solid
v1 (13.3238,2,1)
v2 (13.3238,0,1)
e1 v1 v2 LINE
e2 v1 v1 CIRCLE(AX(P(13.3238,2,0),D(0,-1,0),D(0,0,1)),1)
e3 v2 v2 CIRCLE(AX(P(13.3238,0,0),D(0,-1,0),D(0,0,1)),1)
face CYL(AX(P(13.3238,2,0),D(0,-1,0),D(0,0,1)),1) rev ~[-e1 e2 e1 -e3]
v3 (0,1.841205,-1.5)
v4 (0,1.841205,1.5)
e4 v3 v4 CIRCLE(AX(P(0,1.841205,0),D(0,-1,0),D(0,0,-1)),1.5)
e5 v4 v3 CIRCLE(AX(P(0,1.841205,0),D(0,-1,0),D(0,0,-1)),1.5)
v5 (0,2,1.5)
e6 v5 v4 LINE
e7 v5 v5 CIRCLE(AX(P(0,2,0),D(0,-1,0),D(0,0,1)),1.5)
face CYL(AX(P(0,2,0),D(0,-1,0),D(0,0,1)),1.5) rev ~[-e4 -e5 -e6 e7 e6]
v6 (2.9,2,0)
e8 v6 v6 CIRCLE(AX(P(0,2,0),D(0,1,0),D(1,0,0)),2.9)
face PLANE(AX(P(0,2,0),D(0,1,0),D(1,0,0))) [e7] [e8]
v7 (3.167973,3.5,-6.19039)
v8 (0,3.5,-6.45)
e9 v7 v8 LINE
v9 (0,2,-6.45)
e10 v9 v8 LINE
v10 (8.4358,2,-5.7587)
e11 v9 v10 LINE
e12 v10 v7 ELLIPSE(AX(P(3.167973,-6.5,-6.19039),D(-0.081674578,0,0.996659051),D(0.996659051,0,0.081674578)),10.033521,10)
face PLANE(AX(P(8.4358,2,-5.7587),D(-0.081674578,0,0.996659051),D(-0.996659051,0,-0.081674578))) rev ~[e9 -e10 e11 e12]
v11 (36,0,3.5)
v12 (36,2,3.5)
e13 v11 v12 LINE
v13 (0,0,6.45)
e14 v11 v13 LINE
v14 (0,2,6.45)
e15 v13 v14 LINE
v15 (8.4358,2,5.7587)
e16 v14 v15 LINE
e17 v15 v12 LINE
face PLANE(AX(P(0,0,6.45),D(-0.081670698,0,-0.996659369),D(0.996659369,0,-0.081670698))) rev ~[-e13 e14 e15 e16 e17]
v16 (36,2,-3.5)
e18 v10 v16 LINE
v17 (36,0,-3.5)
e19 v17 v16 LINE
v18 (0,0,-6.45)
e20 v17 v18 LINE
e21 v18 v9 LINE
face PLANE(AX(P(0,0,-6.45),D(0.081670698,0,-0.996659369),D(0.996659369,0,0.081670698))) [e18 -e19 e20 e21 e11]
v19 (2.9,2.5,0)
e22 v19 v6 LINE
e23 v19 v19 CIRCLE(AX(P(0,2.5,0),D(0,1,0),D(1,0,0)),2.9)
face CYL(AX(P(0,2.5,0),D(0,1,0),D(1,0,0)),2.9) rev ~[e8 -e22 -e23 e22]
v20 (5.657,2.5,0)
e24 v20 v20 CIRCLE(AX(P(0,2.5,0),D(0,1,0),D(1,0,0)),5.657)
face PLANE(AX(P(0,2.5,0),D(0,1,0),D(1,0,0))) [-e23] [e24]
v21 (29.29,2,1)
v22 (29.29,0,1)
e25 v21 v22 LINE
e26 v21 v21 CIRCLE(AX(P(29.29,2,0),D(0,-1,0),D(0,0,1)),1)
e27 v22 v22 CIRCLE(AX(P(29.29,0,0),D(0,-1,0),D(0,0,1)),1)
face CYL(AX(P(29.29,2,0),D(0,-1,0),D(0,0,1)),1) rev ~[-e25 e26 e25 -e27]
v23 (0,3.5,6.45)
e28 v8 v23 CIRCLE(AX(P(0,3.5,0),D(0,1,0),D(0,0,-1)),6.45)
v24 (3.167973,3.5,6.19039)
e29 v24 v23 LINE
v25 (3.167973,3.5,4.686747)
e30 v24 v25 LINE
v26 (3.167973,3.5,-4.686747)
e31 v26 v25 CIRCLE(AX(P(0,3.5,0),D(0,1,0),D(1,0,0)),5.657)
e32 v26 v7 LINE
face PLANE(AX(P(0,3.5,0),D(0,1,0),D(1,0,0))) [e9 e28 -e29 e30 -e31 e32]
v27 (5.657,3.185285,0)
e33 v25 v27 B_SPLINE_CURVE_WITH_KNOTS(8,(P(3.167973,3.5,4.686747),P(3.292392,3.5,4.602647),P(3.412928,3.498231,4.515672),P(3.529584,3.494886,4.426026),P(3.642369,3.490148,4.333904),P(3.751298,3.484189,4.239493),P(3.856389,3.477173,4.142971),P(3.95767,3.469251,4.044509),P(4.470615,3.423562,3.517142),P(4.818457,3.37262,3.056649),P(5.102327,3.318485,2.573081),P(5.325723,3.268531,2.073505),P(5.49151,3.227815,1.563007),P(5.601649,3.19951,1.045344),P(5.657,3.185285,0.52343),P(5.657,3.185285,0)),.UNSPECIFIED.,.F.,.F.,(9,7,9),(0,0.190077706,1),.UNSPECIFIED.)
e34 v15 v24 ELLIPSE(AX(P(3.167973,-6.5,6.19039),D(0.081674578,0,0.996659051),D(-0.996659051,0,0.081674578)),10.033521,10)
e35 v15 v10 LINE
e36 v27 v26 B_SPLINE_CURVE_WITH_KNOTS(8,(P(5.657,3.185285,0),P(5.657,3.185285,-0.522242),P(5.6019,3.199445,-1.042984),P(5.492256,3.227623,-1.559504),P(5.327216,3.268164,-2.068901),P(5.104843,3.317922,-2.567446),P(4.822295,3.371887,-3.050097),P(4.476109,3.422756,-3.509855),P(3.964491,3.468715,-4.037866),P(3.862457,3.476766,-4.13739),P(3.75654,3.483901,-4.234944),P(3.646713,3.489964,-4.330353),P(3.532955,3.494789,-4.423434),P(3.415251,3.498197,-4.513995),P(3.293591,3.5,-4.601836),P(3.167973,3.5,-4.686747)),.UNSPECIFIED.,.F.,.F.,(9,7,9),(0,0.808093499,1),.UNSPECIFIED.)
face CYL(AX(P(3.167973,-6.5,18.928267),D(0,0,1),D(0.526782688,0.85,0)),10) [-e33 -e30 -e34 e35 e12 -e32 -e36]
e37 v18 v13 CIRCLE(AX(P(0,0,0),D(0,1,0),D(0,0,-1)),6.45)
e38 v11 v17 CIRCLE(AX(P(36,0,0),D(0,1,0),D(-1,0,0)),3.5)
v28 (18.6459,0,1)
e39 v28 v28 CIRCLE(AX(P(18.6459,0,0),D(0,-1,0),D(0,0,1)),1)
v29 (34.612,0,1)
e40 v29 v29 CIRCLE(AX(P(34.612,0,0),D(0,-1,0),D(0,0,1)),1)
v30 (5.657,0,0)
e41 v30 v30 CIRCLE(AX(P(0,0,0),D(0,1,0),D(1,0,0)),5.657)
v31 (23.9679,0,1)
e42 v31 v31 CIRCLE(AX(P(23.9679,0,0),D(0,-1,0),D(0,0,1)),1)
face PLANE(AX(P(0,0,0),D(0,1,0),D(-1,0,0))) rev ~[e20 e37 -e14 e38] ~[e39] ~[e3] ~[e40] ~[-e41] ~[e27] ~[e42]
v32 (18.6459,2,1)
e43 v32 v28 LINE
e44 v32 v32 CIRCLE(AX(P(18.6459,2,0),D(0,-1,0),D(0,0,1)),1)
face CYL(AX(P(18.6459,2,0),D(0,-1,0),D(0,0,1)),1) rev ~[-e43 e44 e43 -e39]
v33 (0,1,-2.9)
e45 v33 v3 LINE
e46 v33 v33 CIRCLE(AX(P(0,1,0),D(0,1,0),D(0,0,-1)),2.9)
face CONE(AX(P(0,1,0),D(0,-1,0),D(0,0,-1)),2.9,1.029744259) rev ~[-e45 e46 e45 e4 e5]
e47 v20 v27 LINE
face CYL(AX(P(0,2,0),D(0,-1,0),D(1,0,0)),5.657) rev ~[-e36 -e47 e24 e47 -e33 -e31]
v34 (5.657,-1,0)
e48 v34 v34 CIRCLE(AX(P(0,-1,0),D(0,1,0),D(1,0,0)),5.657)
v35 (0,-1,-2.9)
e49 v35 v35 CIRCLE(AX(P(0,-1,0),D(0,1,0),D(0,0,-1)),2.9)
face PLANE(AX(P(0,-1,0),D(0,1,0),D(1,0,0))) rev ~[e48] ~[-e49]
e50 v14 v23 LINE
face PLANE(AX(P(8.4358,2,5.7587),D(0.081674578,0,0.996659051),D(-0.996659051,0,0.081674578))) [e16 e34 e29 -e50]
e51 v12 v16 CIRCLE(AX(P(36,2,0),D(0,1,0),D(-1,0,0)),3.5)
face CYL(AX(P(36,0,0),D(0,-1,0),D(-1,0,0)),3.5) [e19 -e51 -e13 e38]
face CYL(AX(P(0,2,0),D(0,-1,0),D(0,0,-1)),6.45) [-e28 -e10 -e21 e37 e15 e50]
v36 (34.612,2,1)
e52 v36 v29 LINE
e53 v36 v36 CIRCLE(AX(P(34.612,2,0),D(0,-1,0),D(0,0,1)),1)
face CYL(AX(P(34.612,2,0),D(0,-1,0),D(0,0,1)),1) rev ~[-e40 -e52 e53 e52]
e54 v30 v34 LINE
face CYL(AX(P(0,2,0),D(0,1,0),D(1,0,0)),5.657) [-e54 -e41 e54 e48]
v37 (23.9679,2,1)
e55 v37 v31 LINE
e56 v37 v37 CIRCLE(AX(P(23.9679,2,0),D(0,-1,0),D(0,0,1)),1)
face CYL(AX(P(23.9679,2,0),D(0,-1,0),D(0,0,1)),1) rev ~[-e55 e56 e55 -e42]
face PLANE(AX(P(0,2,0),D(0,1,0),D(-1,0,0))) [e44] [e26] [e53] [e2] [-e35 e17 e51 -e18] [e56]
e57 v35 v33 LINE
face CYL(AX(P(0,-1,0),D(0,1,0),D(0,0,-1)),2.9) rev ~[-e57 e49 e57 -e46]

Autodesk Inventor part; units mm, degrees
ref_plane "YZ Plane" through (0, 0, 0) normal (1, 0, 0) x (0, 1, 0)
ref_plane "XZ Plane" through (0, 0, 0) normal (0, 1, 0) x (-1, 0, 0)
ref_plane "XY Plane" through (0, 0, 0) normal (0, 0, 1) x (1, 0, 0)
sketch "Sketch1" plane through (0, 0, 0) normal (0, 1, 0) x (-1, 0, 0)
  circle A0 centre (0, 0) radius 6.45
  circle A1 centre (0, 0) radius 5.657
  circle A2 centre (0, 0) radius 2.85
  circle A3 centre (0, 0) radius 1.5
  line L0 (0, 0) -> (-36, 0)
  circle A4 centre (-36, 0) radius 3.5
  line L1 (0, 6.45) -> (-36, 3.5)
  line L2 (0, -6.45) -> (-36, -3.5)
  dimension "d0" = 12.9
  dimension "d1" = 11.314
  dimension "d2" = 5.7
  dimension "d3" = 3
  dimension "d4" = 36
  dimension "d5" = 7
extrude "Extrusion1" add sketch "Sketch1" along normal blind 2 contours A0 L2 L1 | A0 L0 A4 L1 | L2 A4 L0 A0 | A4
sketch "Sketch2" plane through (0, 2, 0) normal (0, 1, 0) x (1, 0, 0)
  line L0 (8.4358, -5.7587) -> (8.4358, 5.7587)
  line L1 (8.4358, -5.7587) -> (0, -6.45)
  line L2 (0, -6.45) -> (36, -3.5) projected
  line L3 (8.4358, 5.7587) -> (0, 6.45)
  line L4 (36, 3.5) -> (0, 6.45) projected
  arc A0 (0, 6.45) -> (0, -6.45) centre (0, 0) ccw
  arc A1 (0, 6.45) -> (0, -6.45) centre (0, 0) ccw projected
  circle A2 centre (0, 0) radius 5.657
extrude "Extrusion2" add sketch "Sketch2" along normal blind 1.5
fillet "Fillet1" radius 10 1 edges at (8.4358, 3.5, 0)
sketch "Sketch4" plane through (0, 2, 0) normal (0, 1, 0) x (1, 0, 0)
  circle A0 centre (0, 0) radius 2.9
  circle A1 centre (0, 0) radius 1.5
  dimension "d11" = 5.8
  dimension "d12" = 3
sketch "Sketch5" plane through (0, 2, 0) normal (0, 1, 0) x (1, 0, 0)
  circle A0 centre (0, 0) radius 5.657
extrude "Extrusion3" add sketch "Sketch5" along normal blind 0.5 and the other way blind 3
sketch "Sketch6" plane through (0, 2.5, 0) normal (0, 1, 0) x (1, 0, 0)
  circle A0 centre (0, 0) radius 2.9
  dimension "d17" = 5.8
extrude "Extrusion4" cut sketch "Sketch6" against normal blind 0.5
hole "Hole1" at (0, 2, 0) direction (0, -1, 0) diameter 3 end through all
sketch "Sketch7" plane through (0, -1, 0) normal (0, -1, 0) x (1, 0, 0)
  circle A0 centre (0, 0) radius 2.9
  dimension "d27" = 5.8
hole "Hole2" at (0, -1, 0) direction (0, 1, 0) diameter 5.8 depth 2 tip angle 118
sketch "Sketch9" plane through (0, 2, 0) normal (0, 1, 0) x (1, 0, 0)
  line L0 (8.4358, 5.7587) -> (8.4358, -5.7587) projected
  arc A0 (36, -3.5) -> (36, 3.5) centre (36, 0) ccw projected
  circle A1 centre (23.9679, 0) radius 1
  circle A2 centre (34.612, 0) radius 1
  line L1 (0, -6.45) -> (36, -3.5) projected
  circle A3 centre (29.29, 0) radius 1
  circle A4 centre (13.3238, 0) radius 1
  circle A5 centre (18.6459, 0) radius 1
  point P0 (0, 0)
hole "Hole4" at (13.3238, 2, 0) at (18.6459, 2, 0) at (23.9679, 2, 0) at (29.29, 2, 0) at (34.612, 2, 0) direction (0, -1, 0) diameter 2 end through all
properties part number "servo_arm_2"
